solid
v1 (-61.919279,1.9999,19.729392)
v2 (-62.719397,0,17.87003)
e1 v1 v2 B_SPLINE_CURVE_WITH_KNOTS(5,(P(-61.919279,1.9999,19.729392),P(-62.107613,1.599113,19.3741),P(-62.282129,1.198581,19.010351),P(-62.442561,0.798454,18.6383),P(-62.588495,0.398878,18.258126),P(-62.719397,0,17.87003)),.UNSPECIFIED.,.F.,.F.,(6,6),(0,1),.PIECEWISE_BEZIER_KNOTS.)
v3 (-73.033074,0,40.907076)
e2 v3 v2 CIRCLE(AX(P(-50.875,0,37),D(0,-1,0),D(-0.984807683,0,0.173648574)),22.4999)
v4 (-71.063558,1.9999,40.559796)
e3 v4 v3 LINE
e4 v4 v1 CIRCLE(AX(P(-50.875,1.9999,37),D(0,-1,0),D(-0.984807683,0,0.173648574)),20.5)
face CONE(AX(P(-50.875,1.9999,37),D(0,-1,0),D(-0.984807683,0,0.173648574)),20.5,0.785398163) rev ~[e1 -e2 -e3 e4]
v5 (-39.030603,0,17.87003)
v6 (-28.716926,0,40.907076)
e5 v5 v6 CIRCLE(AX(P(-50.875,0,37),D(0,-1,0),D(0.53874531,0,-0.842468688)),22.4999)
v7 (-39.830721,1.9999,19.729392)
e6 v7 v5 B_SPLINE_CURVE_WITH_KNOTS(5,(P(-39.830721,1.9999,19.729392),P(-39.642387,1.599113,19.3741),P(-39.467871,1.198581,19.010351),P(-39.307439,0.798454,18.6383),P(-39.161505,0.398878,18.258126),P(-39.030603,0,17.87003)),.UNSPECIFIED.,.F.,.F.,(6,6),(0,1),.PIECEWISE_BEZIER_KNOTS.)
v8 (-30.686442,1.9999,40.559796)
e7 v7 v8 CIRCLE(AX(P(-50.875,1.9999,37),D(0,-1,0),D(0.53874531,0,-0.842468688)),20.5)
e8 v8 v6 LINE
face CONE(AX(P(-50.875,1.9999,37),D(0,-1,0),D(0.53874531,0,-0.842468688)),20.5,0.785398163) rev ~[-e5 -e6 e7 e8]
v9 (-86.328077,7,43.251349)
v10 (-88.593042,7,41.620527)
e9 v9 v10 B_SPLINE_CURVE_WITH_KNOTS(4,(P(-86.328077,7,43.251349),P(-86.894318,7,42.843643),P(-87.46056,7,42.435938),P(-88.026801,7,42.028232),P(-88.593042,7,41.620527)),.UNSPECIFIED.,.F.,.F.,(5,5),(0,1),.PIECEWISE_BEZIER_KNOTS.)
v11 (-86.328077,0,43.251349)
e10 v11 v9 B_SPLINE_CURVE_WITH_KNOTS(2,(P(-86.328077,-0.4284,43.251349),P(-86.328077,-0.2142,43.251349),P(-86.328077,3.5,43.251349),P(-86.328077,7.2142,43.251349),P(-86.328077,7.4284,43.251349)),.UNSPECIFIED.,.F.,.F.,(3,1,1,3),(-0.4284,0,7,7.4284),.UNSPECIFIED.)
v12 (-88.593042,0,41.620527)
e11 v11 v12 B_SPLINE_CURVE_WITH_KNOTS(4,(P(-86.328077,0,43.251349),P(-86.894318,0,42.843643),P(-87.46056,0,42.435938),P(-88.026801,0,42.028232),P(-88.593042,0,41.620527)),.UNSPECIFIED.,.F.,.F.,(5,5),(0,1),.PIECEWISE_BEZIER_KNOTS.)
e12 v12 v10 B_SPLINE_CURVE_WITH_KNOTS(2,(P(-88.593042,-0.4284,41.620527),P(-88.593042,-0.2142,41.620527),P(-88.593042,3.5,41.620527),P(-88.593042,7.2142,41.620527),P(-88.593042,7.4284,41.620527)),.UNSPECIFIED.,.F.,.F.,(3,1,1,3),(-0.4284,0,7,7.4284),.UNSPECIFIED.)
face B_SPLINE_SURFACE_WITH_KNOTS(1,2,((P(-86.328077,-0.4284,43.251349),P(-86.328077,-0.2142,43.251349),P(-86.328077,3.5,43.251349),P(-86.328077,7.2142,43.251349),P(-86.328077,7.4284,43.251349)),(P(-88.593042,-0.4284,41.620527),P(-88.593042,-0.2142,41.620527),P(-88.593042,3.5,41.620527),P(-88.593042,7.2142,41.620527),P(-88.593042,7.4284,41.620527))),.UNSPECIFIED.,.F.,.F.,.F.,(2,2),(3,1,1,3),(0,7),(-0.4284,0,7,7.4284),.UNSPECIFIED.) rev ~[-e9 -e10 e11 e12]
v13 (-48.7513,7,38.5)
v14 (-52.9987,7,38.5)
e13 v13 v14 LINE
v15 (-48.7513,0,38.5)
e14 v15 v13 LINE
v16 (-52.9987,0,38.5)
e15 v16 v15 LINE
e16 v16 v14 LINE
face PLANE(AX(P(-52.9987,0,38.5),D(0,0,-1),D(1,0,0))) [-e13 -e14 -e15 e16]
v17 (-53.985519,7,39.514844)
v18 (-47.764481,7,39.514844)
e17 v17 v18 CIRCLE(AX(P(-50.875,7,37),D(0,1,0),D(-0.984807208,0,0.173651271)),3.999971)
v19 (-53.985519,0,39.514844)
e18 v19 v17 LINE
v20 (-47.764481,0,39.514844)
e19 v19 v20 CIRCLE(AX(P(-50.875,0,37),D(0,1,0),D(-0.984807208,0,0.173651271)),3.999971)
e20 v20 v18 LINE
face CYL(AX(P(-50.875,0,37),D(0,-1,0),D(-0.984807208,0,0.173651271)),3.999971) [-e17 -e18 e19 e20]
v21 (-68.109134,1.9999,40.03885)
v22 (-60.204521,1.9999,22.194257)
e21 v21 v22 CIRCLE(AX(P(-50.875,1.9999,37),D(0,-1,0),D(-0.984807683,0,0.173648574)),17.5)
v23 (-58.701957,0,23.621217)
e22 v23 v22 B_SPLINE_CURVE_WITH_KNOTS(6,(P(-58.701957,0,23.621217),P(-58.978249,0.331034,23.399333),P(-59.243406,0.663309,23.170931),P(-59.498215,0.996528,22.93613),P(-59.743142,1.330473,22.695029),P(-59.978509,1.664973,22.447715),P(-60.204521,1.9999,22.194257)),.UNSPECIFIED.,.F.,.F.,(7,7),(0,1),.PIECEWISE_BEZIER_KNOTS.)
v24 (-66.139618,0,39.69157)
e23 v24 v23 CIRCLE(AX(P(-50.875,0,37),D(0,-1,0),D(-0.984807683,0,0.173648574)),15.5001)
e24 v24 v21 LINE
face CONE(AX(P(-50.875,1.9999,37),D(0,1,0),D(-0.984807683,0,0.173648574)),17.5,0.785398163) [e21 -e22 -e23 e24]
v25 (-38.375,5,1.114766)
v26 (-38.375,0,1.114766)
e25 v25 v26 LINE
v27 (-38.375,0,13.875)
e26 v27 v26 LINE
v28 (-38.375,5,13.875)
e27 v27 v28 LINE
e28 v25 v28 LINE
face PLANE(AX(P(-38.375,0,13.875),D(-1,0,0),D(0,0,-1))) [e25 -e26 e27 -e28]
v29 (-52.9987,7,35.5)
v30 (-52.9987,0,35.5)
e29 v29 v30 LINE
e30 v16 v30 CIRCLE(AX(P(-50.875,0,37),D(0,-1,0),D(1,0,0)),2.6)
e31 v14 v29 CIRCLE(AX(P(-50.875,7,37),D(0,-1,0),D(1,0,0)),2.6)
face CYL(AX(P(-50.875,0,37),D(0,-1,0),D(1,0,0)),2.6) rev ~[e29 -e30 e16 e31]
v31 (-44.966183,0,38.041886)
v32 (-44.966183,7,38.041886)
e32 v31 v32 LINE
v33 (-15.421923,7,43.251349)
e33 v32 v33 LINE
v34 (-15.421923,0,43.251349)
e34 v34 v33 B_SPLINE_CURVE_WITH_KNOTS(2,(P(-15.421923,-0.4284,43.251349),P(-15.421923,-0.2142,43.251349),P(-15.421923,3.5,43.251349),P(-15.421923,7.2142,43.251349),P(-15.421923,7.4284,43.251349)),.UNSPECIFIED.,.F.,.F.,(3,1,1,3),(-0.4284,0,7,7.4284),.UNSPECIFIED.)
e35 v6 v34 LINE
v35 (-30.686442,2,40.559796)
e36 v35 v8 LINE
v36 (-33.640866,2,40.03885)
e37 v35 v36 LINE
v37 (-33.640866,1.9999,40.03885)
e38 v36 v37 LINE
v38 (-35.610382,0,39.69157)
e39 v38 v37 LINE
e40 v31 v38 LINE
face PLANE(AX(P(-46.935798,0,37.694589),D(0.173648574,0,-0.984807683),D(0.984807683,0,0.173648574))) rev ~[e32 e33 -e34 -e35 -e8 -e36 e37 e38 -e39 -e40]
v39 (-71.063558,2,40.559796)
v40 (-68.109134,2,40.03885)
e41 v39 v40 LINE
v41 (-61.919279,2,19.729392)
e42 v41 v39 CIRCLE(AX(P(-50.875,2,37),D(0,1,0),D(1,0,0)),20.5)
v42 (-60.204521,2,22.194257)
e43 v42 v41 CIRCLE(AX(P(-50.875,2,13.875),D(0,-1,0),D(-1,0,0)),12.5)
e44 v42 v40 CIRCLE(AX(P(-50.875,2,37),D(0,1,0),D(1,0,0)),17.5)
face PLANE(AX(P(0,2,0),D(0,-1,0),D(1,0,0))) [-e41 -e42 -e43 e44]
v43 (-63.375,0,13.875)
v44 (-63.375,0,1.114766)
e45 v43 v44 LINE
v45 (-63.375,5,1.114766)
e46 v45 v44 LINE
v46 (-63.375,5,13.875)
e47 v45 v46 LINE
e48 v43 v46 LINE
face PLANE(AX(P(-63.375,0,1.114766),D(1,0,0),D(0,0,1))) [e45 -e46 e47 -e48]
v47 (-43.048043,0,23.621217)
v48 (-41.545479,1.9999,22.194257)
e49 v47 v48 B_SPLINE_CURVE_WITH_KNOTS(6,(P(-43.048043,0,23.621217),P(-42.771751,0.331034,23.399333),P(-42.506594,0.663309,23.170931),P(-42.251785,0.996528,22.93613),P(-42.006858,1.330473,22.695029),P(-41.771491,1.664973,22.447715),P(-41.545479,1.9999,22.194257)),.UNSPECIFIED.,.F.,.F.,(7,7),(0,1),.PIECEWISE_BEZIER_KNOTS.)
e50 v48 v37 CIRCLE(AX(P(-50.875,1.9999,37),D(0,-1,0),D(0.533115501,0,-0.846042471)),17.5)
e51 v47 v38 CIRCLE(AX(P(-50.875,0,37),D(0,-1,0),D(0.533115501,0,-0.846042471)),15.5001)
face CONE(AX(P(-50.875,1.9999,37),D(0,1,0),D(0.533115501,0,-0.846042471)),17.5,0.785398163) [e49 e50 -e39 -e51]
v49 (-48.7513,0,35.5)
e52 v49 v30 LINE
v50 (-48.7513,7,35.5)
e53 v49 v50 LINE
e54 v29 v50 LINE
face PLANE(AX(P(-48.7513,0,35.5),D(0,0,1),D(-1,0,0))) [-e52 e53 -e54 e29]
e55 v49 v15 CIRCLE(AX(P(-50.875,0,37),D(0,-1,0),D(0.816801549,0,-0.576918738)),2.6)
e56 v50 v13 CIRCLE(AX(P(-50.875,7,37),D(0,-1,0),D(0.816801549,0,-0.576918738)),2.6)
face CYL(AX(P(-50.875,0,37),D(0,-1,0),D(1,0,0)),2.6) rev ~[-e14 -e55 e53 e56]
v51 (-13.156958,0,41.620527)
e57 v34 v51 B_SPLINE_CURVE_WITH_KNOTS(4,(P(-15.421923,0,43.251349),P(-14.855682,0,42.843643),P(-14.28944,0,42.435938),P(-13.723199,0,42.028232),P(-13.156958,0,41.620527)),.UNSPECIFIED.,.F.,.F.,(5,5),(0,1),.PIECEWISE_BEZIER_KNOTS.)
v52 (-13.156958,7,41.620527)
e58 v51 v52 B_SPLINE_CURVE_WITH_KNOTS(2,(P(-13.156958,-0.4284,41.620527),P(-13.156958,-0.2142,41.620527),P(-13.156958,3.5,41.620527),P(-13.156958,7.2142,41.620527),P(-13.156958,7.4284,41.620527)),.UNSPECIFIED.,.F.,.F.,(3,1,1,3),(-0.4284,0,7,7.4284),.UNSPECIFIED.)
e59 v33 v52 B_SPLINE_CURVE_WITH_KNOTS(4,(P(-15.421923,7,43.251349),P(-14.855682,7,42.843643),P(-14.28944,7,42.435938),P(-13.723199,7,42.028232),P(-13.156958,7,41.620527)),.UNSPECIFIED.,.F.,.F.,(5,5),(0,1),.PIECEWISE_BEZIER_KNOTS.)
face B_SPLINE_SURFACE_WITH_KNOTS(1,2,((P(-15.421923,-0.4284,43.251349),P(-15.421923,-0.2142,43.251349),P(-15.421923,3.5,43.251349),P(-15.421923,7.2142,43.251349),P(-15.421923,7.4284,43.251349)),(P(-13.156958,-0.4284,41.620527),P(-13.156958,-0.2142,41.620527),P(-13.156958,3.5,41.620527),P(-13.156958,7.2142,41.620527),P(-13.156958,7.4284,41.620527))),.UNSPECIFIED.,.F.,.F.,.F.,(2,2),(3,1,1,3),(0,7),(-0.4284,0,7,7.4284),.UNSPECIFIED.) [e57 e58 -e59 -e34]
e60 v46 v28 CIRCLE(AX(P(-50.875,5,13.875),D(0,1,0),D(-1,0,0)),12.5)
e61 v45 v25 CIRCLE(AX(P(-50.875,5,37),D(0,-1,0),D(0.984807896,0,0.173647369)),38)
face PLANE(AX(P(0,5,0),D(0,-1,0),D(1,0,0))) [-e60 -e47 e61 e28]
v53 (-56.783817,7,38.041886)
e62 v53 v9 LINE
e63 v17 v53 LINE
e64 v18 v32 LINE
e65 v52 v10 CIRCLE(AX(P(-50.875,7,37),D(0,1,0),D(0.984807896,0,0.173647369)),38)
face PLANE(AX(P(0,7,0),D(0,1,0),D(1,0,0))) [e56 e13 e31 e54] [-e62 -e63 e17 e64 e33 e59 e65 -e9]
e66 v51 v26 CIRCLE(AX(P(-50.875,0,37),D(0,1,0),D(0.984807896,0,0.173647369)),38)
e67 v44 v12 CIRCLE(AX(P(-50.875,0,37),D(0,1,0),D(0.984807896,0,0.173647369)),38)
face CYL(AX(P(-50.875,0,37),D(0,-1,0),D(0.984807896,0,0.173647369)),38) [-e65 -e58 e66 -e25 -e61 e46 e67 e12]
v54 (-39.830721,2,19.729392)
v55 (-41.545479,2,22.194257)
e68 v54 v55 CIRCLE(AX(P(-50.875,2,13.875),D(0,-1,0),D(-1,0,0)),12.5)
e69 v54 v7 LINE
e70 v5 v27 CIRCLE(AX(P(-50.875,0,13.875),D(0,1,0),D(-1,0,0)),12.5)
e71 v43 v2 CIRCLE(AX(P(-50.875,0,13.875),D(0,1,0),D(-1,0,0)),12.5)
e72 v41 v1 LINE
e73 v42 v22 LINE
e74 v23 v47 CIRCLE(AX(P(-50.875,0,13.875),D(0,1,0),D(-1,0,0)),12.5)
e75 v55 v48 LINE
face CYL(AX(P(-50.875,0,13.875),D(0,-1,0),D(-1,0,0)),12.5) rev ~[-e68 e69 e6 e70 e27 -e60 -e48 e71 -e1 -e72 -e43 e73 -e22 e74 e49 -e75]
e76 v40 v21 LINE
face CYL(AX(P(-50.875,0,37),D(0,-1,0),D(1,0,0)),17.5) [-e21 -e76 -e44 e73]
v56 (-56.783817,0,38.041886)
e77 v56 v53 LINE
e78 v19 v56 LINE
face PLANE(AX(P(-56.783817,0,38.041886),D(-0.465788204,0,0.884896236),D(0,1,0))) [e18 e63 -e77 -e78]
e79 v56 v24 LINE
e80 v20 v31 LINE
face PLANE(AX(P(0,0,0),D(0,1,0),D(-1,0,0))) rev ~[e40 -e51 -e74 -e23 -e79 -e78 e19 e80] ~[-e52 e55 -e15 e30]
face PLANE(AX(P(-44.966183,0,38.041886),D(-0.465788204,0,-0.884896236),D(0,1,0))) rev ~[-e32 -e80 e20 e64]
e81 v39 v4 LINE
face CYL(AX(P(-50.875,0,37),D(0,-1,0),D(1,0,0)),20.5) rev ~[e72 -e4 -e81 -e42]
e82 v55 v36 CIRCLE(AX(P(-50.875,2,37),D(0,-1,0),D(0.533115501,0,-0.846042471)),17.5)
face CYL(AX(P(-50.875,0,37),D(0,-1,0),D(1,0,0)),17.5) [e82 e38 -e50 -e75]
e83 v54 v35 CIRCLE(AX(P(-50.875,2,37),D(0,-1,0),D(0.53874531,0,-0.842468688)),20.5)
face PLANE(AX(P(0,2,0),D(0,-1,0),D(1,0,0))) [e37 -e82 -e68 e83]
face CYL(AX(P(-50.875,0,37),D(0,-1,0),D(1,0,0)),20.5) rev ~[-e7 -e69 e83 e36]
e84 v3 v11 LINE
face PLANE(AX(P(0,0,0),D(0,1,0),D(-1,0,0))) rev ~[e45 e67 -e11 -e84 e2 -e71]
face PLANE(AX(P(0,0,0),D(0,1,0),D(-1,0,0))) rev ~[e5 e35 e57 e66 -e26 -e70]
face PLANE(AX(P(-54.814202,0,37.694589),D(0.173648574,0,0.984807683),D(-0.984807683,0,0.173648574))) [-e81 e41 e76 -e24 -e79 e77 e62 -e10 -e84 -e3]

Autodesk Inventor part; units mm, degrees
ref_plane "YZ Plane" through (0, 0, 0) normal (1, 0, 0) x (0, 1, 0)
ref_plane "XZ Plane" through (0, 0, 0) normal (0, 1, 0) x (-1, 0, 0)
ref_plane "XY Plane" through (0, 0, 0) normal (0, 0, 1) x (1, 0, 0)
sketch "スケッチ1" plane through (0, 0, 0) normal (0, 1, 0) x (-1, 0, 0)
  arc A0 (54.8142, 37.6946) -> (46.9358, 37.6946) centre (50.875, 37) ccw
  circle A1 centre (50.875, 13.875) radius 12.5
  line L0 (50.875, 37) -> (87.3129, 43.425)
  line L1 (50.875, 37) -> (87.875, 37) construction
  line L2 (87.3129, 43.425) -> (50.875, 37)
  line L3 (50.875, 37) -> (14.4371, 43.425)
  arc A2 (13.4523, 43.5986) -> (88.2977, 43.5986) centre (50.875, 37) ccw
  line L4 (87.3129, 43.425) -> (88.2977, 43.5986)
  line L5 (13.4523, 43.5986) -> (14.4371, 43.425)
  point P0 (0, 0)
  dimension "d22" = 25
  dimension "d27" = 10
  dimension "d38" = 4
  dimension "d49" = 76
extrude "押し出し1" add sketch "スケッチ1" along normal blind 7
sketch "スケッチ2" plane through (0, 7, 0) normal (0, 1, 0) x (1, 0, 0)
  circle A0 centre (-50.875, -13.875) radius 12.5
  circle A1 centre (-50.875, -13.875) radius 12.5
  point P0 (0, 0)
extrude "押し出し2" add sketch "スケッチ2" against normal blind 2
sketch "スケッチ3" plane through (0, 0, 0) normal (0, -1, 0) x (1, 0, 0)
  circle A0 centre (-50.875, 13.875) radius 12.5 projected
  circle A1 centre (-50.875, 13.875) radius 12.5 projected
  line L0 (-63.375, 13.875) -> (-38.375, 13.875)
  line L1 (-38.375, 13.875) -> (-38.375, -3.3785)
  line L2 (-38.375, -3.3785) -> (-63.375, -3.3785)
  line L3 (-63.375, -3.3785) -> (-63.375, 13.875)
  line L4 (-46.9358, 37.6946) -> (-13.4523, 43.5986) projected
  line L5 (-88.2977, 43.5986) -> (-54.8142, 37.6946) projected
  arc A2 (-88.2977, 43.5986) -> (-13.4523, 43.5986) centre (-50.875, 37) ccw projected
  arc A3 (-46.9358, 37.6946) -> (-54.8142, 37.6946) centre (-50.875, 37) ccw projected
  point P0 (0, 0)
extrude "押し出し3" cut sketch "スケッチ3" against normal blind 5 contours L1 A2 L3 A0 | A0 L0 | L1 L2 L3 A2 picked at (-53.2419, 10.4459)
sketch "スケッチ4" plane through (0, 0, 0) normal (0, -1, 0) x (1, 0, 0)
  circle A0 centre (-50.875, 37) radius 2.6
  arc A1 (-38.375, 13.875) -> (-63.375, 13.875) centre (-50.875, 13.875) ccw projected
  line L0 (-63.375, 1.1148) -> (-63.375, 13.875) projected
  line L1 (-38.375, 13.875) -> (-38.375, 1.1148) projected
  line L2 (-46.9358, 37.6946) -> (-13.4523, 43.5986) projected
  line L3 (-52.9987, 38.5) -> (-48.7513, 38.5)
  line L4 (-42.875, 38.5) -> (-42.875, 38.4106)
  line L5 (-48.7513, 35.5) -> (-52.9987, 35.5)
  line L6 (-58.875, 38.4106) -> (-58.875, 38.5)
  arc A2 (-38.375, 1.1148) -> (-13.4523, 43.5986) centre (-50.875, 37) ccw projected
  line L7 (-88.2977, 43.5986) -> (-54.8142, 37.6946) projected
  arc A3 (-88.2977, 43.5986) -> (-63.375, 1.1148) centre (-50.875, 37) ccw projected
  arc A4 (-46.9358, 37.6946) -> (-54.8142, 37.6946) centre (-50.875, 37) ccw projected
  point P0 (0, 0)
  dimension "d12" = 5.2
  dimension "d47" = 3
extrude "押し出し4" cut sketch "スケッチ4" against normal blind 8 contours A0 L5 L3
chamfer "面取り1" distance 2 angle 45 4 edges at (-88.2977, 3.5, 43.5986) (-46.9358, 3.5, 37.6946) (-13.4523, 3.5, 43.5986) (-54.8142, 3.5, 37.6946)
sketch "スケッチ8" plane through (0, 7, 0) normal (0, 1, 0) x (1, 0, 0)
  line L0 (-44.9662, -38.0419) -> (-15.4219, -43.2513) projected
  arc A0 (-48.7513, -38.5) -> (-48.7513, -35.5) centre (-50.875, -37) ccw projected
  arc A1 (-13.157, -41.6206) -> (-88.593, -41.6206) centre (-50.875, -37) ccw projected
  line L1 (-86.3281, -43.2513) -> (-56.7838, -38.0419) projected
  arc A2 (-52.9987, -35.5) -> (-52.9987, -38.5) centre (-50.875, -37) ccw projected
  line L2 (-52.9987, -35.5) -> (-48.7513, -35.5) projected
  line L3 (-48.7513, -38.5) -> (-52.9987, -38.5) projected
  arc A3 (-53.9856, -39.5148) -> (-47.7644, -39.5148) centre (-50.875, -37) ccw projected
  line L4 (-13.157, -41.6206) -> (-15.4219, -43.2513) projected
  line L5 (-86.3281, -43.2513) -> (-88.593, -41.6206) projected
  line L6 (-53.9856, -39.5148) -> (-56.7838, -38.0419) projected
  line L7 (-44.9662, -38.0419) -> (-47.7644, -39.5148) projected
  point P0 (0, 0)
extrude "押し出し8" cut sketch "スケッチ8" along normal blind 0.5 contours L3 A2 L2 A0
sketch "スケッチ9" plane through (0, 0, 0) normal (0, -1, 0) x (1, 0, 0)
  line L0 (-48.7513, 35.5) -> (-52.9987, 35.5) projected
  arc A0 (-52.9987, 38.5) -> (-52.9987, 35.5) centre (-50.875, 37) ccw projected
  arc A1 (-48.7513, 35.5) -> (-48.7513, 38.5) centre (-50.875, 37) ccw projected
  line L1 (-44.9662, 38.0419) -> (-15.4219, 43.2513) projected
  line L2 (-63.375, 1.1148) -> (-63.375, 13.875) projected
  arc A2 (-38.375, 13.875) -> (-63.375, 13.875) centre (-50.875, 13.875) ccw projected
  line L3 (-38.375, 13.875) -> (-38.375, 1.1148) projected
  circle A3 centre (-50.875, 37) radius 17.5
  circle A4 centre (-50.875, 37) radius 20.5
  circle A5 centre (-50.875, 37) radius 19
  line L4 (-86.3281, 43.2513) -> (-56.7838, 38.0419) projected
  arc A6 (-88.593, 41.6206) -> (-63.375, 1.1148) centre (-50.875, 37) ccw projected
  arc A7 (-38.375, 1.1148) -> (-13.157, 41.6206) centre (-50.875, 37) ccw projected
  line L5 (-52.9987, 38.5) -> (-48.7513, 38.5) projected
  arc A8 (-47.7644, 39.5148) -> (-53.9856, 39.5148) centre (-50.875, 37) ccw projected
  line L6 (-15.4219, 43.2513) -> (-13.157, 41.6206) projected
  line L7 (-47.7644, 39.5148) -> (-44.9662, 38.0419) projected
  line L8 (-56.7838, 38.0419) -> (-53.9856, 39.5148) projected
  line L9 (-88.593, 41.6206) -> (-86.3281, 43.2513) projected
  point P0 (0, 0)
  dimension "d39" = 35
  dimension "d40" = 41
  dimension "d41" = 38
extrude "押し出し9" cut sketch "スケッチ9" against normal blind 2 contours L0 A0 L5 A1 | A3 L4 A5 L1 | L1 A5 A2 A3 | A5 L4 A4 L1 | L1 A4 A2 A5 | A3 A2 A5 L4 | A5 A2 A4 L4 | A2 A5 A3 | A2 A4 A5
chamfer "面取り2" distance 2 angle 45 4 edges at (-69.646, 0, 28.7598) (-32.104, 0, 28.7598) (-66.8754, 0, 29.9123) (-34.8746, 0, 29.9123)
properties part number "RescueKitThrow-Joint"
